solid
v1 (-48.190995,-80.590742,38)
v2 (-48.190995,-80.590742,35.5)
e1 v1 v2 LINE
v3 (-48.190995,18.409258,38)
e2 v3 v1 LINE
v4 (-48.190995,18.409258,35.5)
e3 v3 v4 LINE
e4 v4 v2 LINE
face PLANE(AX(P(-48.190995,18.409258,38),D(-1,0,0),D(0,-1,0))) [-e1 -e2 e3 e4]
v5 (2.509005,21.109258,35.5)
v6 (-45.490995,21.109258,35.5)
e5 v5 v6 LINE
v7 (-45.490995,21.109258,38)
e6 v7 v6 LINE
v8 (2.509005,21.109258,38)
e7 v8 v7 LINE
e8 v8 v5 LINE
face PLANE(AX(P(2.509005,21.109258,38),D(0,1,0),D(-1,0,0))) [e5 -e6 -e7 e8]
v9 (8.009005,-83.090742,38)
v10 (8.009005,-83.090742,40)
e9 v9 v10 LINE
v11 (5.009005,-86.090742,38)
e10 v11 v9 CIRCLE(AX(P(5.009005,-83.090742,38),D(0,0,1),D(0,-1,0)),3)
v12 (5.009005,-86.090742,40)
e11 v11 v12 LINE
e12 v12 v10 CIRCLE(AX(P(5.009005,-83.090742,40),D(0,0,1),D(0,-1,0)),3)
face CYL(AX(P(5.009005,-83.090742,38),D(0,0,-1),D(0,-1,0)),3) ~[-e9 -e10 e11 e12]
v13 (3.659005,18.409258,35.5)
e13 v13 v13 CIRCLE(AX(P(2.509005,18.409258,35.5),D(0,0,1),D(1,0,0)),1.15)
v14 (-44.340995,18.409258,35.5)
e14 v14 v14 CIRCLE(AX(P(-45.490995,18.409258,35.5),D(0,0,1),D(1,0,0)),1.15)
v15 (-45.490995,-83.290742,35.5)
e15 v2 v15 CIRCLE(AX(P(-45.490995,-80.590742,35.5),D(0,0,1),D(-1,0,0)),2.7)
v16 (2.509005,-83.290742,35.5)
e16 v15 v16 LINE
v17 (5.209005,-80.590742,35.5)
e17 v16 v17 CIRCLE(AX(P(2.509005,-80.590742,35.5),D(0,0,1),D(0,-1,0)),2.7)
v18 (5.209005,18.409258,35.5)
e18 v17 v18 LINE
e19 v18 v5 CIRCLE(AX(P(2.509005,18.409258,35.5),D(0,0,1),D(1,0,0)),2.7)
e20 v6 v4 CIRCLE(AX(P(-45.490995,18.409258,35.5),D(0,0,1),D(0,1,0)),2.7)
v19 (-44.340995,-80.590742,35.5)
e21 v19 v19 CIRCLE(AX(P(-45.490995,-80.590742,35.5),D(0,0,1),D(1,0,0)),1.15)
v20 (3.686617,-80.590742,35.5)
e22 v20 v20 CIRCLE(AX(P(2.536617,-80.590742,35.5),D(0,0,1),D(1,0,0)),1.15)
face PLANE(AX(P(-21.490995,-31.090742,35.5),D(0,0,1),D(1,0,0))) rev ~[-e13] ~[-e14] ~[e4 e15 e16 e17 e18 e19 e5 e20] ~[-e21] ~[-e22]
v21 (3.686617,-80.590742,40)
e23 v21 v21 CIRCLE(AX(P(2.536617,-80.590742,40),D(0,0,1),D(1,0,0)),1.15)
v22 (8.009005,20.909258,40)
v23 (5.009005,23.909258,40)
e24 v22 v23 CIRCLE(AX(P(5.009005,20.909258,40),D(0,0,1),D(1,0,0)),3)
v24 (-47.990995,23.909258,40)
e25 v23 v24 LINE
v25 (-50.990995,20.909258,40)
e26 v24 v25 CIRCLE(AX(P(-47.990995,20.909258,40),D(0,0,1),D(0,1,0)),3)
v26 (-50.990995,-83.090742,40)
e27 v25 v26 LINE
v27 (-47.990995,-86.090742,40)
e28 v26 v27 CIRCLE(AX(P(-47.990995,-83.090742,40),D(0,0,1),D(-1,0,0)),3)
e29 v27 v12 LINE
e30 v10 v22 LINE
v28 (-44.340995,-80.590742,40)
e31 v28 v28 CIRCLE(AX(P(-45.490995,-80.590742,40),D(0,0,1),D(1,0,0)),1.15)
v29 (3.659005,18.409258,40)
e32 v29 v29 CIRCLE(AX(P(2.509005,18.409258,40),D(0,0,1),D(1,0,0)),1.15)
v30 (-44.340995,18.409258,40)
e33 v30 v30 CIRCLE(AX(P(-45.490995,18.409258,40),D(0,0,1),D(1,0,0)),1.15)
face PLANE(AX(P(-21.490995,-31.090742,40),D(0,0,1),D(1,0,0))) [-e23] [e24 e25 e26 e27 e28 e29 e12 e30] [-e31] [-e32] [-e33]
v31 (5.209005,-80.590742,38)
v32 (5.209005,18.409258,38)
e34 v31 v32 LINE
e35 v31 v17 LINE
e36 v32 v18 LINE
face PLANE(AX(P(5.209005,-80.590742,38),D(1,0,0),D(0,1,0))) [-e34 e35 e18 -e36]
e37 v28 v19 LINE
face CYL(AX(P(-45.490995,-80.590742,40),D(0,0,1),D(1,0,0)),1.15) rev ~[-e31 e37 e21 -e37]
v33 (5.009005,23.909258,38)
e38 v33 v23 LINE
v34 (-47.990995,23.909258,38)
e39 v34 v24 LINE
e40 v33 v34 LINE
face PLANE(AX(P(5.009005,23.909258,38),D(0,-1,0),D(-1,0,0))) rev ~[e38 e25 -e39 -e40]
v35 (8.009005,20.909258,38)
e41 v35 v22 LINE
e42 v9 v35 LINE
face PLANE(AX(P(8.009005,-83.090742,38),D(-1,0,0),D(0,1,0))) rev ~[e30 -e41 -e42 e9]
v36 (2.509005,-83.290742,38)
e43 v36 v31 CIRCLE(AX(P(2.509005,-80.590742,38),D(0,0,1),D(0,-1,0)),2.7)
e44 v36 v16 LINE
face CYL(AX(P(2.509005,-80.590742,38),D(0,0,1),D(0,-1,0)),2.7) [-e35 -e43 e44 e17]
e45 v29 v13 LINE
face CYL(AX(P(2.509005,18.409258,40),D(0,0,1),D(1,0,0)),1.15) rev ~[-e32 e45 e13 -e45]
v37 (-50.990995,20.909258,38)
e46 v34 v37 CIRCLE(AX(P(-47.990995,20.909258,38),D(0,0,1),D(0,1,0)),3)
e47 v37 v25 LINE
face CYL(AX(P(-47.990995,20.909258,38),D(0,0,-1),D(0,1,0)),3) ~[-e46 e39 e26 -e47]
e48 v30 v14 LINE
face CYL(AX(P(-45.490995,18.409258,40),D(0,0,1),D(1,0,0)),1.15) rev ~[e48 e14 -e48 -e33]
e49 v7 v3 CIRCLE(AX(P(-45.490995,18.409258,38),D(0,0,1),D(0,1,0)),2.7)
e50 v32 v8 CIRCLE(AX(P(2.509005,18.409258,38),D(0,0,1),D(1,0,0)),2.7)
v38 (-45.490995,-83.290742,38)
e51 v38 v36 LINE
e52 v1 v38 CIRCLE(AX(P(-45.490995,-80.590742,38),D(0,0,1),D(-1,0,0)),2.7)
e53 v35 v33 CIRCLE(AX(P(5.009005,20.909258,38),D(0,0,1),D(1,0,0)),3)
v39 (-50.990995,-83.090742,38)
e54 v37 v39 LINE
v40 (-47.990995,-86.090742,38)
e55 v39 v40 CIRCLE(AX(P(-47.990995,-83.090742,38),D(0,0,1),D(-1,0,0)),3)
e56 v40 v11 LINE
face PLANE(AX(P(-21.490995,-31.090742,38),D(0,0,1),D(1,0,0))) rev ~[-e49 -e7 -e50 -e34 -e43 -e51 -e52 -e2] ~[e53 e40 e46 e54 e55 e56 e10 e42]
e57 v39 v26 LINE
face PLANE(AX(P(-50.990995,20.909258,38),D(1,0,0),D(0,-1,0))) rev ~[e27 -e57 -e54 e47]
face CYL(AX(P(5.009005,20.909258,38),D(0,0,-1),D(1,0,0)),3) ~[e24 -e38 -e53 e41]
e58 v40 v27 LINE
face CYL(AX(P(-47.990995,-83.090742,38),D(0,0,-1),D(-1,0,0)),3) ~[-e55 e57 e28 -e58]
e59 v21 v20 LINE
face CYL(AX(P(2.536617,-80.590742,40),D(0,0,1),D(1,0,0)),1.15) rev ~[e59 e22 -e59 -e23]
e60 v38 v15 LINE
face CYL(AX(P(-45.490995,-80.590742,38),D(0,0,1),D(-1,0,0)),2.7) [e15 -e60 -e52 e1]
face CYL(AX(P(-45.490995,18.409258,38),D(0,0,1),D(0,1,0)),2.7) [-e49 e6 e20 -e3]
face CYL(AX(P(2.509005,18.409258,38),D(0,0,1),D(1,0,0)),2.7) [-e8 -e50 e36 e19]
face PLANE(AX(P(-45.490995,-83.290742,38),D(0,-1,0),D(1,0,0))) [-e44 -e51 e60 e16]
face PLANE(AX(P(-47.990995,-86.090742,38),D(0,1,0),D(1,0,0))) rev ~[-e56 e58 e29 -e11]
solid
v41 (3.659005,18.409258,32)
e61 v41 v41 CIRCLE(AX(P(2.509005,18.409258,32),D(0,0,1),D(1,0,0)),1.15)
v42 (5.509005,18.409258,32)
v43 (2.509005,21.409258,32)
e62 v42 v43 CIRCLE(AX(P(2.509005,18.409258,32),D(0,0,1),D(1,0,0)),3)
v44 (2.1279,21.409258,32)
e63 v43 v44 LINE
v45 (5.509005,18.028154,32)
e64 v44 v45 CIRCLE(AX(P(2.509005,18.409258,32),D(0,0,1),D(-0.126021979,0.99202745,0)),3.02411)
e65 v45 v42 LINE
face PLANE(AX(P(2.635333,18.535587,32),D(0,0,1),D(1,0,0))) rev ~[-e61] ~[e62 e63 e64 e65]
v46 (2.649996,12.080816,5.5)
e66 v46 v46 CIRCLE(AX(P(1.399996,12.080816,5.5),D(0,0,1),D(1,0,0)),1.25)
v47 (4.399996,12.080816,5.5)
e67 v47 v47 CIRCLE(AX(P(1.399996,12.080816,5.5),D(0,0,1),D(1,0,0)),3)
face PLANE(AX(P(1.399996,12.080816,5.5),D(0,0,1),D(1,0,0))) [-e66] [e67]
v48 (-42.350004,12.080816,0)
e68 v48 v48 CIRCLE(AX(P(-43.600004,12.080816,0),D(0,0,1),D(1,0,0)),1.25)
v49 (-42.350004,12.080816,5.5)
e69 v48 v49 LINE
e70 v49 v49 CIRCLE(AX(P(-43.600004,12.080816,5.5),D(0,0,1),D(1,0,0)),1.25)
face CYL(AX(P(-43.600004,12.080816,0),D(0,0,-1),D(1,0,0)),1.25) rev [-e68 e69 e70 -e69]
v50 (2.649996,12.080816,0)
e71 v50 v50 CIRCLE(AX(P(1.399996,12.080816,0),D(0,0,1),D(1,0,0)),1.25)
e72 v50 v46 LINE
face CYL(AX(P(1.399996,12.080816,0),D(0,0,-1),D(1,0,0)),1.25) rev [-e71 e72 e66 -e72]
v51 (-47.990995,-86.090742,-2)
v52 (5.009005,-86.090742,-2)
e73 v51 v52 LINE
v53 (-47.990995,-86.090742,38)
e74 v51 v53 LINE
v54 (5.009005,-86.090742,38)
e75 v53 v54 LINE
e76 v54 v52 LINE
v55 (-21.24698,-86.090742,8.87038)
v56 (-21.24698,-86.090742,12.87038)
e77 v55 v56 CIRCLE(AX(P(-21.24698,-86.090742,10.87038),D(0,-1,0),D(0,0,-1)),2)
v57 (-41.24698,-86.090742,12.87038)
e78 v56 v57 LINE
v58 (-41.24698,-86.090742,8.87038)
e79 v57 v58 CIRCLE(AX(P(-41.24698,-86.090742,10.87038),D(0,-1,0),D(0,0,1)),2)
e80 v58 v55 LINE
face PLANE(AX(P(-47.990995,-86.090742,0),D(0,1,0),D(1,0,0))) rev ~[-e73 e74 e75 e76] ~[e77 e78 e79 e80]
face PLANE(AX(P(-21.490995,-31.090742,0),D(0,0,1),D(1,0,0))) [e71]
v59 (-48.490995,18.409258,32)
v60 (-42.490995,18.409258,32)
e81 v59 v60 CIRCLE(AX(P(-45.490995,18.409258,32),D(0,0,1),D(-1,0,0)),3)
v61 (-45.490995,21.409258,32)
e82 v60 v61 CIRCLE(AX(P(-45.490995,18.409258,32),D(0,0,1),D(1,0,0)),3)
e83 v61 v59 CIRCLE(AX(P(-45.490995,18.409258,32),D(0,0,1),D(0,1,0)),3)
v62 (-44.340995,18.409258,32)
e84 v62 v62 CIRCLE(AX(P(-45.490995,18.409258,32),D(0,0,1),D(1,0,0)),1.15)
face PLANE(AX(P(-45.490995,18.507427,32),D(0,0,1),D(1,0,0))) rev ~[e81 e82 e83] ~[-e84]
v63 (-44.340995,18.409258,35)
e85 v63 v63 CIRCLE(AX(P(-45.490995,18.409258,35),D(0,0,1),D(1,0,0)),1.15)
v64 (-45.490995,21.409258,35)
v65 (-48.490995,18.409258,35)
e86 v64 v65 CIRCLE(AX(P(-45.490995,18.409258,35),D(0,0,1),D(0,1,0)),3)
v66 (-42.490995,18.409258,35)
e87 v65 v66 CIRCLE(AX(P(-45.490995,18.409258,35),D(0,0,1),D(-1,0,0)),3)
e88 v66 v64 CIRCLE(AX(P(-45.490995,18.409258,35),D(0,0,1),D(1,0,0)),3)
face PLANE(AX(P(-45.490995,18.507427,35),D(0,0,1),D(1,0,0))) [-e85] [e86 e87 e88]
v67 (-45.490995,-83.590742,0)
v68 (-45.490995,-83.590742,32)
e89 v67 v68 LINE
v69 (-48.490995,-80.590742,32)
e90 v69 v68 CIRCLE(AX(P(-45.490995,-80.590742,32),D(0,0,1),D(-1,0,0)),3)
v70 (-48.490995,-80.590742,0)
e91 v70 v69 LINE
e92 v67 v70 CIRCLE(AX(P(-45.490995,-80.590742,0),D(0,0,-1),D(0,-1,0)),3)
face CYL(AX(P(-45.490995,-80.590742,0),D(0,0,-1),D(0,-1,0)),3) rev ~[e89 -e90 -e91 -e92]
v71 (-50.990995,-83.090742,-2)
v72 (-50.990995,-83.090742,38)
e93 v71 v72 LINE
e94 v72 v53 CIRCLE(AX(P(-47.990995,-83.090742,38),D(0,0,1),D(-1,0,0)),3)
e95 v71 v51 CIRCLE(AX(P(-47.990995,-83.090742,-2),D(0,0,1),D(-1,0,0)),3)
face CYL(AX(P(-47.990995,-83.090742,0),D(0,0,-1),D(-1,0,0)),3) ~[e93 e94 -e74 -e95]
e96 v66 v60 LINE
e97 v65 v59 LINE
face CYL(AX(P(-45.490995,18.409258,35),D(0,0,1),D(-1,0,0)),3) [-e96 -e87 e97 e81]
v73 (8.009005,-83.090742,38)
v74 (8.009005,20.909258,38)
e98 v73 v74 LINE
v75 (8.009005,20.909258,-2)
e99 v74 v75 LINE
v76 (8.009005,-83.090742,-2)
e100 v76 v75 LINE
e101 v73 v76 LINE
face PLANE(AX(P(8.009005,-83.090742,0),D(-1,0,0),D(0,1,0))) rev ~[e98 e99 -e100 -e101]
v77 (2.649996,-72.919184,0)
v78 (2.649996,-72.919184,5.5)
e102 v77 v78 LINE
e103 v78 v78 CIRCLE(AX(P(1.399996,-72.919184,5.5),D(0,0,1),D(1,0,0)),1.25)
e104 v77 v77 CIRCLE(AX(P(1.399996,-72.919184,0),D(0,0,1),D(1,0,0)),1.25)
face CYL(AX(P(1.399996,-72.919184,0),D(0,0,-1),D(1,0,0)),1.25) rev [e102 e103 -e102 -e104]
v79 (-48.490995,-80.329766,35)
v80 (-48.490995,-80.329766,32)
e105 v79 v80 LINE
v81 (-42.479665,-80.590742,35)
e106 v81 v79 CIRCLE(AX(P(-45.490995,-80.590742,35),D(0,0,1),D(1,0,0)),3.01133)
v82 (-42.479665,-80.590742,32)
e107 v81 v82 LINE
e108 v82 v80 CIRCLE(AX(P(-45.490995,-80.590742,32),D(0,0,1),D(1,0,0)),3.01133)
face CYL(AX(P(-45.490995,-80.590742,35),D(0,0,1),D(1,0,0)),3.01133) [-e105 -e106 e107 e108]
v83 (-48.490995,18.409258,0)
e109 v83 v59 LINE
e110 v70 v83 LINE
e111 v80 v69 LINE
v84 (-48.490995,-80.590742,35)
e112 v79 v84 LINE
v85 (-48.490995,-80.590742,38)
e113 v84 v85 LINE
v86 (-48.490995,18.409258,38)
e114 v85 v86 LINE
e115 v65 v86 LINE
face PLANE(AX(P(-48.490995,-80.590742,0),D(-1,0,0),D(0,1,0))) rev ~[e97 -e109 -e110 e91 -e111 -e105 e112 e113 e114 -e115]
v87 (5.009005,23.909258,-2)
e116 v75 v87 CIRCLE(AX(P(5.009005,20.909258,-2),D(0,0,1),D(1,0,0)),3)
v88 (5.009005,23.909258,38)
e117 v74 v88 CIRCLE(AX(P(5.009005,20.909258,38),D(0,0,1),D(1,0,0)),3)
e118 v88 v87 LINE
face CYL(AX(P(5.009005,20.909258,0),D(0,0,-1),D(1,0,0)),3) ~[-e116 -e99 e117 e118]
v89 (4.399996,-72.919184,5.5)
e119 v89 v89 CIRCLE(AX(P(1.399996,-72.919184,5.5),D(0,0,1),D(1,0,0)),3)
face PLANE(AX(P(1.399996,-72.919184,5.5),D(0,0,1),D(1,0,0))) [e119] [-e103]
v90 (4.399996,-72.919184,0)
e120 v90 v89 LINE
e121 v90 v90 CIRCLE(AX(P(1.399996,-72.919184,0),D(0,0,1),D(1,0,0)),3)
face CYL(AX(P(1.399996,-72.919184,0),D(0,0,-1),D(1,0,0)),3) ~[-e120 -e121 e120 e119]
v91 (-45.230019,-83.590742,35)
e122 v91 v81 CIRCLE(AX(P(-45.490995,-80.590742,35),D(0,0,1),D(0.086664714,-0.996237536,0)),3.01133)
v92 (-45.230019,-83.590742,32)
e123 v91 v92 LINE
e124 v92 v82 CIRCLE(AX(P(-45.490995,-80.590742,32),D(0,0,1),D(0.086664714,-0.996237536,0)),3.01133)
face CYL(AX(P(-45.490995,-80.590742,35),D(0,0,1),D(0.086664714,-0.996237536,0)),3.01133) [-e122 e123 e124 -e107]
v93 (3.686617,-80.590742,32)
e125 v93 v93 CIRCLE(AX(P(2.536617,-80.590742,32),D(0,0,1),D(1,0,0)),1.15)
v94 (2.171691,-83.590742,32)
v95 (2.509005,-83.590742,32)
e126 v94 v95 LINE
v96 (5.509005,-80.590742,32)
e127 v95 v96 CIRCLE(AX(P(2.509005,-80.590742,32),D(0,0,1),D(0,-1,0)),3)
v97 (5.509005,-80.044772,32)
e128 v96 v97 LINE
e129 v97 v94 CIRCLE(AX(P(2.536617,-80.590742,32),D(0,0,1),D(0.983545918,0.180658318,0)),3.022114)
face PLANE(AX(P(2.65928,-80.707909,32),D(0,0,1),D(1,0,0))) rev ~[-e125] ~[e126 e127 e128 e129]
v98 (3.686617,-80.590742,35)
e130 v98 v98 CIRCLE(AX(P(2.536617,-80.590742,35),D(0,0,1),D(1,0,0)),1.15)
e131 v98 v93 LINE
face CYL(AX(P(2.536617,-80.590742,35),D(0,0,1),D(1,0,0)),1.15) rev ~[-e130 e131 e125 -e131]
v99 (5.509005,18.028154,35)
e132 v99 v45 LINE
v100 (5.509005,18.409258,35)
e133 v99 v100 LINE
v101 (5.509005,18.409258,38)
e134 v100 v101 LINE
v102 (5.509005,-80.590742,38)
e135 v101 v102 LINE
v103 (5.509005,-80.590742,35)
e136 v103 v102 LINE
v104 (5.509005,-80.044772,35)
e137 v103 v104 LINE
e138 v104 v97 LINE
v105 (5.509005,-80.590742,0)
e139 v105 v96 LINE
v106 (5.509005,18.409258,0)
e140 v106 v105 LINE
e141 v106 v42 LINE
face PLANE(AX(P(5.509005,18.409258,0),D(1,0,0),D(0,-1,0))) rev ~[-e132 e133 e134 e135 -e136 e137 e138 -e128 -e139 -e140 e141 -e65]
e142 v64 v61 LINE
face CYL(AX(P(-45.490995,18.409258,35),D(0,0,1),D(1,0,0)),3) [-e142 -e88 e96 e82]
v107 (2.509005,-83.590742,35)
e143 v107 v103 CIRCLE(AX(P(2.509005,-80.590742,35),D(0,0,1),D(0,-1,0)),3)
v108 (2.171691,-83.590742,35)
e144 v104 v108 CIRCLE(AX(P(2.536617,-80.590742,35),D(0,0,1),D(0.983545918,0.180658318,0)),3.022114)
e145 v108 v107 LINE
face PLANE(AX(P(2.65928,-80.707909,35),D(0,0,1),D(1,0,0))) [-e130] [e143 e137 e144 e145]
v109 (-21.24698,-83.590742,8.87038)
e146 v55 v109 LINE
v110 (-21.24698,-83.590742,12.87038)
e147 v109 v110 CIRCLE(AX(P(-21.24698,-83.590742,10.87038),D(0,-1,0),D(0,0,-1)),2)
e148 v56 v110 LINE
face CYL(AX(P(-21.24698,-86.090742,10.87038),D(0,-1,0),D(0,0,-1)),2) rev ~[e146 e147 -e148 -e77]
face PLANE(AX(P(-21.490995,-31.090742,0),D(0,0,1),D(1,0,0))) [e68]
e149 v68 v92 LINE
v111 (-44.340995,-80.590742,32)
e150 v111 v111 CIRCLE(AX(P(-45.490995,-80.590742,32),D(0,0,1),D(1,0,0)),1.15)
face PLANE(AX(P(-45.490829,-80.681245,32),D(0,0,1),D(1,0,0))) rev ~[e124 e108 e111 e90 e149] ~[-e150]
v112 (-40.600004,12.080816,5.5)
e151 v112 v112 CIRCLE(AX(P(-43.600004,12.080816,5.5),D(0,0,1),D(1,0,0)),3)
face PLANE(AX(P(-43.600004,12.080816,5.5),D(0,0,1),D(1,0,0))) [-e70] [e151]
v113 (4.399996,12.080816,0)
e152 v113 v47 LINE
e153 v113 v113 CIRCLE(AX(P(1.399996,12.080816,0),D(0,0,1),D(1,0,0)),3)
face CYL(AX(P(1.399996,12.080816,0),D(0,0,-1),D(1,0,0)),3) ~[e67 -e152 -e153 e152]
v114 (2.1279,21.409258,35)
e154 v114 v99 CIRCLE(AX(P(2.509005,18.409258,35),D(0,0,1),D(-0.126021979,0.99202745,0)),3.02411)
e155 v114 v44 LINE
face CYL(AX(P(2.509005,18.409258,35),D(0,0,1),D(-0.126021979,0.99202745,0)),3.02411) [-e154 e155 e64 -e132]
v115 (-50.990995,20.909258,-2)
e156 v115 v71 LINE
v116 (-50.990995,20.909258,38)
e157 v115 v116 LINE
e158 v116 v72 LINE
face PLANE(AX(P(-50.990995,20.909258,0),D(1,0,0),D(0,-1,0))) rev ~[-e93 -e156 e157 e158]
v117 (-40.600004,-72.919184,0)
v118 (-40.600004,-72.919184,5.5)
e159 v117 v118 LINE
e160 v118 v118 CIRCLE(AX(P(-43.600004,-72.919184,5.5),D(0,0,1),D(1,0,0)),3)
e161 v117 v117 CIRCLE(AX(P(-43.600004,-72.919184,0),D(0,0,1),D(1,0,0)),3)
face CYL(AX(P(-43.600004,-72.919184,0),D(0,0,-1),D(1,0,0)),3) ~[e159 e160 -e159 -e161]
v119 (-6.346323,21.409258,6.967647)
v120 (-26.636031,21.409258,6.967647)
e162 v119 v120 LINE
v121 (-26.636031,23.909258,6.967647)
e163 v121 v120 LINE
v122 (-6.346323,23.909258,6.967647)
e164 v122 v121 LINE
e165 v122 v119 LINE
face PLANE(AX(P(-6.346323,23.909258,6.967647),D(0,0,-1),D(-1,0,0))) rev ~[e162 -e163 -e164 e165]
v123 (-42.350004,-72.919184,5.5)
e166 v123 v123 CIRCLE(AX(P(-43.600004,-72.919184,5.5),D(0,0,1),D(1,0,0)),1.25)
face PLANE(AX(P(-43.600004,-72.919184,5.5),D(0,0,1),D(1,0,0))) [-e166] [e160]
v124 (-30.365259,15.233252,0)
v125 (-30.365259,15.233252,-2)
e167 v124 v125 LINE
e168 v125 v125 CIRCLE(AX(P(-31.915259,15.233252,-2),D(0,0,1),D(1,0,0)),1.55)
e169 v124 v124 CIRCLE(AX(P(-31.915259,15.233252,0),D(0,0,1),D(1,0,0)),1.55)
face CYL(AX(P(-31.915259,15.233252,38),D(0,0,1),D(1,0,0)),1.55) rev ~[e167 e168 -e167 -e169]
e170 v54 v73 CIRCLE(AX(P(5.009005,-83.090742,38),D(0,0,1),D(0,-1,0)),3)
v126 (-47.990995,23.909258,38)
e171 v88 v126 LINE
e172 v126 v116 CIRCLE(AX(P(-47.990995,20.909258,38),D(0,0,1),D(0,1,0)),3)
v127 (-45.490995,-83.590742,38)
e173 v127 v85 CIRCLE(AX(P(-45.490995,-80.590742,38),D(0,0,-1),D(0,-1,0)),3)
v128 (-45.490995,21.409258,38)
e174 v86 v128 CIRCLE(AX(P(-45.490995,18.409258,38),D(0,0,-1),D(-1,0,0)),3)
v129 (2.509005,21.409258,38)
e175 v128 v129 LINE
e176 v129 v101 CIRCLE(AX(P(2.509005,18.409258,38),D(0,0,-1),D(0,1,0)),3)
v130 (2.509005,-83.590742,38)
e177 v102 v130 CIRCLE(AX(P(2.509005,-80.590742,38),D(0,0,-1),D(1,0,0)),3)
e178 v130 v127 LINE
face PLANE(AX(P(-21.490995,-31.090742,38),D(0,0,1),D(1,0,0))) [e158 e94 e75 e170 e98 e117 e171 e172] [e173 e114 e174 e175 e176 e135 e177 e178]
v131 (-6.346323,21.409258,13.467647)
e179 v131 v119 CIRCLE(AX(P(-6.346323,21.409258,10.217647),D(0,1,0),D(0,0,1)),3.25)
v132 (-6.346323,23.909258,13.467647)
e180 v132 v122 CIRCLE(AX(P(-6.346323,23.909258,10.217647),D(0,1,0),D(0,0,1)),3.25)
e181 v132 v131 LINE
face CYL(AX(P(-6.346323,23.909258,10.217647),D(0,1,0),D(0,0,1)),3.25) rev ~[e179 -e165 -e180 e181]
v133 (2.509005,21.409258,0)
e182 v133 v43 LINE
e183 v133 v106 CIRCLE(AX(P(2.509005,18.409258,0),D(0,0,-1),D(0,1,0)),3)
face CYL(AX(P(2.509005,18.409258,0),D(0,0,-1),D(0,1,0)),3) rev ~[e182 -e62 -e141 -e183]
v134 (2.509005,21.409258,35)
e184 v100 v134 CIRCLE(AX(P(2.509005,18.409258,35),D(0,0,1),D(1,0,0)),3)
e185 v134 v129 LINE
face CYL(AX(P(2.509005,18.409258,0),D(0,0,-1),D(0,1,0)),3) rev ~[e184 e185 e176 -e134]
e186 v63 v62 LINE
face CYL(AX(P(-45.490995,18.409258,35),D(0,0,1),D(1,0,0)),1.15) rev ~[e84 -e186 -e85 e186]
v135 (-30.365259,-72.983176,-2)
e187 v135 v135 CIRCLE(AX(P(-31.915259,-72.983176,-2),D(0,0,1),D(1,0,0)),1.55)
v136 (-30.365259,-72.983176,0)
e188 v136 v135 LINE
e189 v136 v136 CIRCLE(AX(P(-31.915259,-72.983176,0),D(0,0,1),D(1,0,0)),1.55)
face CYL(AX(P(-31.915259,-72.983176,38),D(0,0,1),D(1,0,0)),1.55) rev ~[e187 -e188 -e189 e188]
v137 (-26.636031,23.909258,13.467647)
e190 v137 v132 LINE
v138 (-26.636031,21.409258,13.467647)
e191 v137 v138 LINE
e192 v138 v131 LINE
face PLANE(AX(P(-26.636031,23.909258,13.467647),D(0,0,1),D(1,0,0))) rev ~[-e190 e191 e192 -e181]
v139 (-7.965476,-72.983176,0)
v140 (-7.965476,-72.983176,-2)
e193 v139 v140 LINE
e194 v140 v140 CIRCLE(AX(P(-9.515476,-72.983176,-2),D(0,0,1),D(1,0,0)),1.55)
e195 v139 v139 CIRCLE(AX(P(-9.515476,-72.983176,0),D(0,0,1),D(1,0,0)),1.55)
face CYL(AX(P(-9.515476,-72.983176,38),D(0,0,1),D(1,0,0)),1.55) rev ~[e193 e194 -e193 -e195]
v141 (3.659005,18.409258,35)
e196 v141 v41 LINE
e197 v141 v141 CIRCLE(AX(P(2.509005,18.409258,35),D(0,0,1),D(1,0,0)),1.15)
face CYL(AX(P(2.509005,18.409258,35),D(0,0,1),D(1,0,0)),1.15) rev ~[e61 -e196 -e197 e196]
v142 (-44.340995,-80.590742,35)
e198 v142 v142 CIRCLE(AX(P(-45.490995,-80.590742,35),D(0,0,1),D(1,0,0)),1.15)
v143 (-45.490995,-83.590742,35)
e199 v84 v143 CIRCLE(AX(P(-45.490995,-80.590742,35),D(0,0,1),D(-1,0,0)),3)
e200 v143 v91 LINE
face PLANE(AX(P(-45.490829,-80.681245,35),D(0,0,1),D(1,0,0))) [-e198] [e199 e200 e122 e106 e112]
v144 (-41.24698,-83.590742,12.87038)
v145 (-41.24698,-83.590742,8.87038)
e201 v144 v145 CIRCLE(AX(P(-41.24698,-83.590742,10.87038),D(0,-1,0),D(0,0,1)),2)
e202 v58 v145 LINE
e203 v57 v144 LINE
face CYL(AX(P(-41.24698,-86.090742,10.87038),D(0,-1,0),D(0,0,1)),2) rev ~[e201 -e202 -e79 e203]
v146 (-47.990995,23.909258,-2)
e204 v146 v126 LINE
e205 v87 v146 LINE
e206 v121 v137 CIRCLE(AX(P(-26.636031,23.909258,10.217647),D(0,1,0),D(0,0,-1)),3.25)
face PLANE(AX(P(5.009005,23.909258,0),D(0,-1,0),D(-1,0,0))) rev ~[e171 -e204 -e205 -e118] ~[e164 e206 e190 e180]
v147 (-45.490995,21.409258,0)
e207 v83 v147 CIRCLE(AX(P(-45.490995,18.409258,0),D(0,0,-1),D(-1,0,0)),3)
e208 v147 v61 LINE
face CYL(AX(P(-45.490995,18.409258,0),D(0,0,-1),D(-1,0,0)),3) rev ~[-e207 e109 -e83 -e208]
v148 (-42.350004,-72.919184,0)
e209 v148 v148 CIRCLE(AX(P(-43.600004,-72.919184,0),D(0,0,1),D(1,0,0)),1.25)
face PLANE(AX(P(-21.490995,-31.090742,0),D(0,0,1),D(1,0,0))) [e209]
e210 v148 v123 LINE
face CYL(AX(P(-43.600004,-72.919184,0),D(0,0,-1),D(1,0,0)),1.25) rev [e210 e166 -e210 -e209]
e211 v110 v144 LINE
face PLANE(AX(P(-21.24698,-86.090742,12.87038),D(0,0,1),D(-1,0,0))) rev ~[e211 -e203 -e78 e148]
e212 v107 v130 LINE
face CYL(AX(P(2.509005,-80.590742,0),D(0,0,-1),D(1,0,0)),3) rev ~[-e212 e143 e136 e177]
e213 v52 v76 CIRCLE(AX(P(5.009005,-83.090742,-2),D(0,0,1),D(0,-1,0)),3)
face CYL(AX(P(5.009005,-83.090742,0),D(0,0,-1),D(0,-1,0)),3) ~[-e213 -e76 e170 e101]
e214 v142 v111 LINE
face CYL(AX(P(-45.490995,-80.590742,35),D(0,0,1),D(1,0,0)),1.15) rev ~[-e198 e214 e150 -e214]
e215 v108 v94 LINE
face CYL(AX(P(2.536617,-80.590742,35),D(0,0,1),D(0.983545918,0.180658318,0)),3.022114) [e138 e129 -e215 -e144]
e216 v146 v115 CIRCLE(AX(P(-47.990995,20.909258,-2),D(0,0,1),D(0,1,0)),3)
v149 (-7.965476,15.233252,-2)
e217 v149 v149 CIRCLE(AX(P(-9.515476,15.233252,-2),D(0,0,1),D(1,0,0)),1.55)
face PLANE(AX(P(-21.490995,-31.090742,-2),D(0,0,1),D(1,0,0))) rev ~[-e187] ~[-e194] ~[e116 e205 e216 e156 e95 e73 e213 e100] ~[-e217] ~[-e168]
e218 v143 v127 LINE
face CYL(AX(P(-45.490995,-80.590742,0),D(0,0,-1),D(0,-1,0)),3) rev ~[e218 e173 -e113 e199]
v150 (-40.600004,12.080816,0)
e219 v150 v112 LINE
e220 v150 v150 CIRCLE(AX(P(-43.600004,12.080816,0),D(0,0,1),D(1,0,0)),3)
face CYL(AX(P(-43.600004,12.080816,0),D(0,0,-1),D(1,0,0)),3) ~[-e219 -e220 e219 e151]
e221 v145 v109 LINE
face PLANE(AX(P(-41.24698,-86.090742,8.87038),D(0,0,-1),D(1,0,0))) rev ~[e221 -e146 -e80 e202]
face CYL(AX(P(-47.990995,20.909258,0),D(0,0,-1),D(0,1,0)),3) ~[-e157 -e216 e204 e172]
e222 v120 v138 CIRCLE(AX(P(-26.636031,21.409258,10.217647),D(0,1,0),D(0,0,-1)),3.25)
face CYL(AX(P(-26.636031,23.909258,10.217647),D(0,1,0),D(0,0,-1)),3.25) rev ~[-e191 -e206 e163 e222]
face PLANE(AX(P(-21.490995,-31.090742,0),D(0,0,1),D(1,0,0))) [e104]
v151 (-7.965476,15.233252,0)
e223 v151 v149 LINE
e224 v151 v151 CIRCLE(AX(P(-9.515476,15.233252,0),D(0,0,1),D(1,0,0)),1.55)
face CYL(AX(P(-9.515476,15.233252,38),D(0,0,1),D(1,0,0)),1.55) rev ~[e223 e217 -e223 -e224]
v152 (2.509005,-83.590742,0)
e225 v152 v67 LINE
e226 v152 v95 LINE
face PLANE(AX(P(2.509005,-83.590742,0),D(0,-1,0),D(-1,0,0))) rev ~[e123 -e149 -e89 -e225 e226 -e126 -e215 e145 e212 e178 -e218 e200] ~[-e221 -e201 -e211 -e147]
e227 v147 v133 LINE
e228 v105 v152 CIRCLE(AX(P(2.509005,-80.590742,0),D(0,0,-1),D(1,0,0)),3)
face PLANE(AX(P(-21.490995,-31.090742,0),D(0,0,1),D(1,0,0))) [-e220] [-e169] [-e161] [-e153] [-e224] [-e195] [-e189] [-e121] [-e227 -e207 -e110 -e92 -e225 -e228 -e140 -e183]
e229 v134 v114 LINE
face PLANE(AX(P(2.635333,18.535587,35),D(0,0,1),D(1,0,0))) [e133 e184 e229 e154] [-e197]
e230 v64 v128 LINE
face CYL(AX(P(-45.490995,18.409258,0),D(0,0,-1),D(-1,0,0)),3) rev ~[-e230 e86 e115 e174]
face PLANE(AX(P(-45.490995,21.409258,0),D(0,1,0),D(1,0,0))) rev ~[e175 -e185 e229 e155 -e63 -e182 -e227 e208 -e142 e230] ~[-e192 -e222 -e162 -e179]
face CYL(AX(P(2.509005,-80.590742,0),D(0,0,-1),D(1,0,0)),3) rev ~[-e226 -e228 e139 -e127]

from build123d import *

# Parameters (mm, degrees)
F1_DEPTH  = 2
F2_DEPTH  = 38
F4_DEPTH  = 25
F6_DEPTH  = 25
F7_R      = 3
F7_R_2    = 1.25
F8_DEPTH  = 5.5
F10_DEPTH = 2.5
F11_DEPTH = 2
F12_R     = 1.55
F13_DEPTH = 120.8
F15_START = -3
F14_R     = 1.15
F15_DEPTH = 3
F16_R     = 1.15
F17_DEPTH = 25


with BuildPart() as f1:
    # F0 (on Top) → F1 (new body)
    with BuildSketch(Plane.XY):
        with BuildLine():
            Line((5.0090045333, 23.9092581272), (-47.9909954667, 23.9092581272))
            ThreePointArc((-47.9909954667, 23.9092581272), (-50.1123158103, 23.0305784708), (-50.9909954667, 20.9092581272))
            Line((-50.9909954667, 20.9092581272), (-50.9909954667, -83.0907418728))
            ThreePointArc((-50.9909954667, -83.0907418728), (-50.1123158103, -85.2120622163), (-47.9909954667, -86.0907418728))
            Line((-47.9909954667, -86.0907418728), (5.0090045333, -86.0907418728))
            ThreePointArc((5.0090045333, -86.0907418728), (7.1303248769, -85.2120622163), (8.0090045333, -83.0907418728))
            Line((8.0090045333, -83.0907418728), (8.0090045333, 20.9092581272))
            ThreePointArc((8.0090045333, 20.9092581272), (7.1303248769, 23.0305784708), (5.0090045333, 23.9092581272))
        make_face()
        with BuildLine():
            ThreePointArc((-48.4909954667, 18.4092581272), (-47.6123158103, 20.5305784708), (-45.4909954667, 21.4092581272))
            Line((-45.4909954667, 21.4092581272), (2.5090045333, 21.4092581272))
            ThreePointArc((2.5090045333, 21.4092581272), (4.6303248769, 20.5305784708), (5.5090045333, 18.4092581272))
            Line((5.5090045333, 18.4092581272), (5.5090045333, -80.5907418728))
            ThreePointArc((5.5090045333, -80.5907418728), (4.6303248769, -82.7120622163), (2.5090045333, -83.5907418728))
            Line((2.5090045333, -83.5907418728), (-45.4909954667, -83.5907418728))
            ThreePointArc((-45.4909954667, -83.5907418728), (-47.6123158103, -82.7120622163), (-48.4909954667, -80.5907418728))
            Line((-48.4909954667, -80.5907418728), (-48.4909954667, 18.4092581272))
        make_face(mode=Mode.SUBTRACT)
        with BuildLine():
            Line((2.5090045333, 21.4092581272), (-45.4909954667, 21.4092581272))
            ThreePointArc((-45.4909954667, 21.4092581272), (-47.6123158103, 20.5305784708), (-48.4909954667, 18.4092581272))
            Line((-48.4909954667, 18.4092581272), (-48.4909954667, -80.5907418728))
            ThreePointArc((-48.4909954667, -80.5907418728), (-47.6123158103, -82.7120622163), (-45.4909954667, -83.5907418728))
            Line((-45.4909954667, -83.5907418728), (2.5090045333, -83.5907418728))
            ThreePointArc((2.5090045333, -83.5907418728), (4.6303248769, -82.7120622163), (5.5090045333, -80.5907418728))
            Line((5.5090045333, -80.5907418728), (5.5090045333, 18.4092581272))
            ThreePointArc((5.5090045333, 18.4092581272), (4.6303248769, 20.5305784708), (2.5090045333, 21.4092581272))
        make_face()
    extrude(amount=-F1_DEPTH)

    # F0 (on Top) → F2 (join)
    with BuildSketch(Plane.XY):
        with BuildLine():
            Line((5.0090045333, 23.9092581272), (-47.9909954667, 23.9092581272))
            ThreePointArc((-47.9909954667, 23.9092581272), (-50.1123158103, 23.0305784708), (-50.9909954667, 20.9092581272))
            Line((-50.9909954667, 20.9092581272), (-50.9909954667, -83.0907418728))
            ThreePointArc((-50.9909954667, -83.0907418728), (-50.1123158103, -85.2120622163), (-47.9909954667, -86.0907418728))
            Line((-47.9909954667, -86.0907418728), (5.0090045333, -86.0907418728))
            ThreePointArc((5.0090045333, -86.0907418728), (7.1303248769, -85.2120622163), (8.0090045333, -83.0907418728))
            Line((8.0090045333, -83.0907418728), (8.0090045333, 20.9092581272))
            ThreePointArc((8.0090045333, 20.9092581272), (7.1303248769, 23.0305784708), (5.0090045333, 23.9092581272))
        make_face()
        with BuildLine():
            ThreePointArc((-48.4909954667, 18.4092581272), (-47.6123158103, 20.5305784708), (-45.4909954667, 21.4092581272))
            Line((-45.4909954667, 21.4092581272), (2.5090045333, 21.4092581272))
            ThreePointArc((2.5090045333, 21.4092581272), (4.6303248769, 20.5305784708), (5.5090045333, 18.4092581272))
            Line((5.5090045333, 18.4092581272), (5.5090045333, -80.5907418728))
            ThreePointArc((5.5090045333, -80.5907418728), (4.6303248769, -82.7120622163), (2.5090045333, -83.5907418728))
            Line((2.5090045333, -83.5907418728), (-45.4909954667, -83.5907418728))
            ThreePointArc((-45.4909954667, -83.5907418728), (-47.6123158103, -82.7120622163), (-48.4909954667, -80.5907418728))
            Line((-48.4909954667, -80.5907418728), (-48.4909954667, 18.4092581272))
        make_face(mode=Mode.SUBTRACT)
    extrude(amount=F2_DEPTH)

    # F3 (on face) → F4 (cut)
    with BuildSketch(Plane.XZ.offset(86.0907418728)):
        with BuildLine():
            ThreePointArc((-41.2469804287, 12.8703803271), (-43.2469804287, 10.8703803271), (-41.2469804287, 8.8703803271))
            Line((-41.2469804287, 8.8703803271), (-21.2469804287, 8.8703803271))
            ThreePointArc((-21.2469804287, 8.8703803271), (-19.2469804287, 10.8703803271), (-21.2469804287, 12.8703803271))
            Line((-21.2469804287, 12.8703803271), (-41.2469804287, 12.8703803271))
        make_face()
    extrude(amount=-F4_DEPTH, mode=Mode.SUBTRACT)

    # F5 (on face) → F6 (cut)
    with BuildSketch(Plane(origin=(0, 23.9092581272, 0), x_dir=(-1, 0, 0), z_dir=(0, 1, 0))):
        with BuildLine():
            ThreePointArc((6.3463230617, 13.4676470682), (3.0963230617, 10.2176470682), (6.3463230617, 6.9676470682))
            Line((6.3463230617, 6.9676470682), (26.636030525, 6.9676470682))
            ThreePointArc((26.636030525, 6.9676470682), (29.886030525, 10.2176470682), (26.636030525, 13.4676470682))
            Line((26.636030525, 13.4676470682), (6.3463230617, 13.4676470682))
        make_face()
    extrude(amount=-F6_DEPTH, mode=Mode.SUBTRACT)

    # F7 (on face) → F8 (join)
    with BuildSketch(Plane.XY):
        with Locations((-43.6000041664, 12.0808156207)):
            Circle(F7_R)
        with Locations((-43.6000041664, 12.0808156207)):
            Circle(F7_R_2, mode=Mode.SUBTRACT)
        with Locations((1.3999958336, 12.0808156207)):
            Circle(F7_R)
        with Locations((1.3999958336, 12.0808156207)):
            Circle(F7_R_2, mode=Mode.SUBTRACT)
        with Locations((-43.6000041664, -72.9191843793)):
            Circle(F7_R)
        with Locations((-43.6000041664, -72.9191843793)):
            Circle(F7_R_2, mode=Mode.SUBTRACT)
        with Locations((1.3999958336, -72.9191843793)):
            Circle(F7_R)
        with Locations((1.3999958336, -72.9191843793)):
            Circle(F7_R_2, mode=Mode.SUBTRACT)
    extrude(amount=F8_DEPTH)

    # F12 (on face) → F13 (cut)
    with BuildSketch(Plane.XY.offset(38)):
        with Locations((-31.9152586162, 15.2332521975)):
            Circle(F12_R)
        with Locations((-9.5154764131, 15.2332521975)):
            Circle(F12_R)
        with Locations((-31.9152586162, -72.9831755161)):
            Circle(F12_R)
        with Locations((-9.5154764131, -72.9831755161)):
            Circle(F12_R)
    extrude(amount=-F13_DEPTH, mode=Mode.SUBTRACT)

    # F14 (on face) → F15 (join)
    with BuildSketch(Plane.XY.offset(38).offset(F15_START)):
        with BuildLine():
            ThreePointArc((5.5090045333, -80.044771904), (0.3358921571, -78.5195149033), (2.1716910566, -83.5907418728))
            Line((2.1716910566, -83.5907418728), (2.5090045333, -83.5907418728))
            ThreePointArc((2.5090045333, -83.5907418728), (4.6303248769, -82.7120622163), (5.5090045333, -80.5907418728))
            Line((5.5090045333, -80.5907418728), (5.5090045333, -80.044771904))
        make_face()
        with Locations((2.5366169866, -80.5907418728)):
            Circle(F14_R, mode=Mode.SUBTRACT)
        with BuildLine():
            Line((-48.4909954667, -80.3297658185), (-48.4909954667, -80.5907418728))
            ThreePointArc((-48.4909954667, -80.5907418728), (-47.6123158103, -82.7120622163), (-45.4909954667, -83.5907418728))
            Line((-45.4909954667, -83.5907418728), (-45.2300194124, -83.5907418728))
            ThreePointArc((-45.2300194124, -83.5907418728), (-43.2713115333, -82.6257140438), (-42.4796654448, -80.5907418728))
            ThreePointArc((-42.4796654448, -80.5907418728), (-45.360384527, -77.5822456898), (-48.4909954667, -80.3297658185))
        make_face()
        with Locations((-45.4909954667, -80.5907418728)):
            Circle(F14_R, mode=Mode.SUBTRACT)
        with BuildLine():
            ThreePointArc((-45.4909954667, 21.4092581272), (-47.6123158103, 20.5305784708), (-48.4909954667, 18.4092581272))
            ThreePointArc((-48.4909954667, 18.4092581272), (-45.4909954667, 15.4092581272), (-42.4909954667, 18.4092581272))
            ThreePointArc((-42.4909954667, 18.4092581272), (-43.3696751231, 20.5305784708), (-45.4909954667, 21.4092581272))
        make_face()
        with Locations((-45.4909954667, 18.4092581272)):
            Circle(F14_R, mode=Mode.SUBTRACT)
        with BuildLine():
            Line((2.5090045333, 21.4092581272), (2.1279002239, 21.4092581272))
            ThreePointArc((2.1279002239, 21.4092581272), (0.3706359385, 16.2708895324), (5.5090045333, 18.0281538178))
            Line((5.5090045333, 18.0281538178), (5.5090045333, 18.4092581272))
            ThreePointArc((5.5090045333, 18.4092581272), (4.6303248769, 20.5305784708), (2.5090045333, 21.4092581272))
        make_face()
        with Locations((2.5090045333, 18.4092581272)):
            Circle(F14_R, mode=Mode.SUBTRACT)
    extrude(amount=-F15_DEPTH)


with BuildPart() as f10:
    # F9 (on face) → F10 (new body)
    with BuildSketch(Plane.XY.offset(38)):
        with BuildLine():
            Line((2.5090045333, 21.1092581272), (-45.4909954667, 21.1092581272))
            ThreePointArc((-45.4909954667, 21.1092581272), (-47.4001837759, 20.3184464364), (-48.1909954667, 18.4092581272))
            Line((-48.1909954667, 18.4092581272), (-48.1909954667, -80.5907418728))
            ThreePointArc((-48.1909954667, -80.5907418728), (-47.4001837759, -82.499930182), (-45.4909954667, -83.2907418728))
            Line((-45.4909954667, -83.2907418728), (2.5090045333, -83.2907418728))
            ThreePointArc((2.5090045333, -83.2907418728), (4.4181928425, -82.499930182), (5.2090045333, -80.5907418728))
            Line((5.2090045333, -80.5907418728), (5.2090045333, 18.4092581272))
            ThreePointArc((5.2090045333, 18.4092581272), (4.4181928425, 20.3184464364), (2.5090045333, 21.1092581272))
        make_face()
    extrude(amount=-F10_DEPTH)

    # F9 (on face) → F11 (join)
    with BuildSketch(Plane.XY.offset(38)):
        with BuildLine():
            Line((-50.9909954667, 20.9092581272), (-50.9909954667, -83.0907418728))
            ThreePointArc((-50.9909954667, -83.0907418728), (-50.1123158103, -85.2120622163), (-47.9909954667, -86.0907418728))
            Line((-47.9909954667, -86.0907418728), (5.0090045333, -86.0907418728))
            ThreePointArc((5.0090045333, -86.0907418728), (7.1303248769, -85.2120622163), (8.0090045333, -83.0907418728))
            Line((8.0090045333, -83.0907418728), (8.0090045333, 20.9092581272))
            ThreePointArc((8.0090045333, 20.9092581272), (7.1303248769, 23.0305784708), (5.0090045333, 23.9092581272))
            Line((5.0090045333, 23.9092581272), (-47.9909954667, 23.9092581272))
            ThreePointArc((-47.9909954667, 23.9092581272), (-50.1123158103, 23.0305784708), (-50.9909954667, 20.9092581272))
        make_face()
        with BuildLine():
            Line((-48.4909954667, -80.5907418728), (-48.4909954667, 18.4092581272))
            ThreePointArc((-48.4909954667, 18.4092581272), (-47.6123158103, 20.5305784708), (-45.4909954667, 21.4092581272))
            Line((-45.4909954667, 21.4092581272), (2.5090045333, 21.4092581272))
            ThreePointArc((2.5090045333, 21.4092581272), (4.6303248769, 20.5305784708), (5.5090045333, 18.4092581272))
            Line((5.5090045333, 18.4092581272), (5.5090045333, -80.5907418728))
            ThreePointArc((5.5090045333, -80.5907418728), (4.6303248769, -82.7120622163), (2.5090045333, -83.5907418728))
            Line((2.5090045333, -83.5907418728), (-45.4909954667, -83.5907418728))
            ThreePointArc((-45.4909954667, -83.5907418728), (-47.6123158103, -82.7120622163), (-48.4909954667, -80.5907418728))
        make_face(mode=Mode.SUBTRACT)
        with BuildLine():
            ThreePointArc((-45.4909954667, 21.4092581272), (-47.6123158103, 20.5305784708), (-48.4909954667, 18.4092581272))
            Line((-48.4909954667, 18.4092581272), (-48.4909954667, -80.5907418728))
            ThreePointArc((-48.4909954667, -80.5907418728), (-47.6123158103, -82.7120622163), (-45.4909954667, -83.5907418728))
            Line((-45.4909954667, -83.5907418728), (2.5090045333, -83.5907418728))
            ThreePointArc((2.5090045333, -83.5907418728), (4.6303248769, -82.7120622163), (5.5090045333, -80.5907418728))
            Line((5.5090045333, -80.5907418728), (5.5090045333, 18.4092581272))
            ThreePointArc((5.5090045333, 18.4092581272), (4.6303248769, 20.5305784708), (2.5090045333, 21.4092581272))
            Line((2.5090045333, 21.4092581272), (-45.4909954667, 21.4092581272))
        make_face()
        with BuildLine():
            ThreePointArc((-48.1909954667, 18.4092581272), (-47.4001837759, 20.3184464364), (-45.4909954667, 21.1092581272))
            Line((-45.4909954667, 21.1092581272), (2.5090045333, 21.1092581272))
            ThreePointArc((2.5090045333, 21.1092581272), (4.4181928425, 20.3184464364), (5.2090045333, 18.4092581272))
            Line((5.2090045333, 18.4092581272), (5.2090045333, -80.5907418728))
            ThreePointArc((5.2090045333, -80.5907418728), (4.4181928425, -82.499930182), (2.5090045333, -83.2907418728))
            Line((2.5090045333, -83.2907418728), (-45.4909954667, -83.2907418728))
            ThreePointArc((-45.4909954667, -83.2907418728), (-47.4001837759, -82.499930182), (-48.1909954667, -80.5907418728))
            Line((-48.1909954667, -80.5907418728), (-48.1909954667, 18.4092581272))
        make_face(mode=Mode.SUBTRACT)
        with BuildLine():
            Line((2.5090045333, 21.1092581272), (-45.4909954667, 21.1092581272))
            ThreePointArc((-45.4909954667, 21.1092581272), (-47.4001837759, 20.3184464364), (-48.1909954667, 18.4092581272))
            Line((-48.1909954667, 18.4092581272), (-48.1909954667, -80.5907418728))
            ThreePointArc((-48.1909954667, -80.5907418728), (-47.4001837759, -82.499930182), (-45.4909954667, -83.2907418728))
            Line((-45.4909954667, -83.2907418728), (2.5090045333, -83.2907418728))
            ThreePointArc((2.5090045333, -83.2907418728), (4.4181928425, -82.499930182), (5.2090045333, -80.5907418728))
            Line((5.2090045333, -80.5907418728), (5.2090045333, 18.4092581272))
            ThreePointArc((5.2090045333, 18.4092581272), (4.4181928425, 20.3184464364), (2.5090045333, 21.1092581272))
        make_face()
    extrude(amount=F11_DEPTH)

    # F16 (on face) → F17 (cut)
    with BuildSketch(Plane.XY.offset(40)):
        with Locations((2.5366169866, -80.5907418728)):
            Circle(F16_R)
        with Locations((-45.4909954667, -80.5907418728)):
            Circle(F16_R)
        with Locations((2.5090045333, 18.4092581272)):
            Circle(F16_R)
        with Locations((-45.4909954667, 18.4092581272)):
            Circle(F16_R)
    extrude(amount=-F17_DEPTH, mode=Mode.SUBTRACT)


solid = Compound([f1.part, f10.part])
